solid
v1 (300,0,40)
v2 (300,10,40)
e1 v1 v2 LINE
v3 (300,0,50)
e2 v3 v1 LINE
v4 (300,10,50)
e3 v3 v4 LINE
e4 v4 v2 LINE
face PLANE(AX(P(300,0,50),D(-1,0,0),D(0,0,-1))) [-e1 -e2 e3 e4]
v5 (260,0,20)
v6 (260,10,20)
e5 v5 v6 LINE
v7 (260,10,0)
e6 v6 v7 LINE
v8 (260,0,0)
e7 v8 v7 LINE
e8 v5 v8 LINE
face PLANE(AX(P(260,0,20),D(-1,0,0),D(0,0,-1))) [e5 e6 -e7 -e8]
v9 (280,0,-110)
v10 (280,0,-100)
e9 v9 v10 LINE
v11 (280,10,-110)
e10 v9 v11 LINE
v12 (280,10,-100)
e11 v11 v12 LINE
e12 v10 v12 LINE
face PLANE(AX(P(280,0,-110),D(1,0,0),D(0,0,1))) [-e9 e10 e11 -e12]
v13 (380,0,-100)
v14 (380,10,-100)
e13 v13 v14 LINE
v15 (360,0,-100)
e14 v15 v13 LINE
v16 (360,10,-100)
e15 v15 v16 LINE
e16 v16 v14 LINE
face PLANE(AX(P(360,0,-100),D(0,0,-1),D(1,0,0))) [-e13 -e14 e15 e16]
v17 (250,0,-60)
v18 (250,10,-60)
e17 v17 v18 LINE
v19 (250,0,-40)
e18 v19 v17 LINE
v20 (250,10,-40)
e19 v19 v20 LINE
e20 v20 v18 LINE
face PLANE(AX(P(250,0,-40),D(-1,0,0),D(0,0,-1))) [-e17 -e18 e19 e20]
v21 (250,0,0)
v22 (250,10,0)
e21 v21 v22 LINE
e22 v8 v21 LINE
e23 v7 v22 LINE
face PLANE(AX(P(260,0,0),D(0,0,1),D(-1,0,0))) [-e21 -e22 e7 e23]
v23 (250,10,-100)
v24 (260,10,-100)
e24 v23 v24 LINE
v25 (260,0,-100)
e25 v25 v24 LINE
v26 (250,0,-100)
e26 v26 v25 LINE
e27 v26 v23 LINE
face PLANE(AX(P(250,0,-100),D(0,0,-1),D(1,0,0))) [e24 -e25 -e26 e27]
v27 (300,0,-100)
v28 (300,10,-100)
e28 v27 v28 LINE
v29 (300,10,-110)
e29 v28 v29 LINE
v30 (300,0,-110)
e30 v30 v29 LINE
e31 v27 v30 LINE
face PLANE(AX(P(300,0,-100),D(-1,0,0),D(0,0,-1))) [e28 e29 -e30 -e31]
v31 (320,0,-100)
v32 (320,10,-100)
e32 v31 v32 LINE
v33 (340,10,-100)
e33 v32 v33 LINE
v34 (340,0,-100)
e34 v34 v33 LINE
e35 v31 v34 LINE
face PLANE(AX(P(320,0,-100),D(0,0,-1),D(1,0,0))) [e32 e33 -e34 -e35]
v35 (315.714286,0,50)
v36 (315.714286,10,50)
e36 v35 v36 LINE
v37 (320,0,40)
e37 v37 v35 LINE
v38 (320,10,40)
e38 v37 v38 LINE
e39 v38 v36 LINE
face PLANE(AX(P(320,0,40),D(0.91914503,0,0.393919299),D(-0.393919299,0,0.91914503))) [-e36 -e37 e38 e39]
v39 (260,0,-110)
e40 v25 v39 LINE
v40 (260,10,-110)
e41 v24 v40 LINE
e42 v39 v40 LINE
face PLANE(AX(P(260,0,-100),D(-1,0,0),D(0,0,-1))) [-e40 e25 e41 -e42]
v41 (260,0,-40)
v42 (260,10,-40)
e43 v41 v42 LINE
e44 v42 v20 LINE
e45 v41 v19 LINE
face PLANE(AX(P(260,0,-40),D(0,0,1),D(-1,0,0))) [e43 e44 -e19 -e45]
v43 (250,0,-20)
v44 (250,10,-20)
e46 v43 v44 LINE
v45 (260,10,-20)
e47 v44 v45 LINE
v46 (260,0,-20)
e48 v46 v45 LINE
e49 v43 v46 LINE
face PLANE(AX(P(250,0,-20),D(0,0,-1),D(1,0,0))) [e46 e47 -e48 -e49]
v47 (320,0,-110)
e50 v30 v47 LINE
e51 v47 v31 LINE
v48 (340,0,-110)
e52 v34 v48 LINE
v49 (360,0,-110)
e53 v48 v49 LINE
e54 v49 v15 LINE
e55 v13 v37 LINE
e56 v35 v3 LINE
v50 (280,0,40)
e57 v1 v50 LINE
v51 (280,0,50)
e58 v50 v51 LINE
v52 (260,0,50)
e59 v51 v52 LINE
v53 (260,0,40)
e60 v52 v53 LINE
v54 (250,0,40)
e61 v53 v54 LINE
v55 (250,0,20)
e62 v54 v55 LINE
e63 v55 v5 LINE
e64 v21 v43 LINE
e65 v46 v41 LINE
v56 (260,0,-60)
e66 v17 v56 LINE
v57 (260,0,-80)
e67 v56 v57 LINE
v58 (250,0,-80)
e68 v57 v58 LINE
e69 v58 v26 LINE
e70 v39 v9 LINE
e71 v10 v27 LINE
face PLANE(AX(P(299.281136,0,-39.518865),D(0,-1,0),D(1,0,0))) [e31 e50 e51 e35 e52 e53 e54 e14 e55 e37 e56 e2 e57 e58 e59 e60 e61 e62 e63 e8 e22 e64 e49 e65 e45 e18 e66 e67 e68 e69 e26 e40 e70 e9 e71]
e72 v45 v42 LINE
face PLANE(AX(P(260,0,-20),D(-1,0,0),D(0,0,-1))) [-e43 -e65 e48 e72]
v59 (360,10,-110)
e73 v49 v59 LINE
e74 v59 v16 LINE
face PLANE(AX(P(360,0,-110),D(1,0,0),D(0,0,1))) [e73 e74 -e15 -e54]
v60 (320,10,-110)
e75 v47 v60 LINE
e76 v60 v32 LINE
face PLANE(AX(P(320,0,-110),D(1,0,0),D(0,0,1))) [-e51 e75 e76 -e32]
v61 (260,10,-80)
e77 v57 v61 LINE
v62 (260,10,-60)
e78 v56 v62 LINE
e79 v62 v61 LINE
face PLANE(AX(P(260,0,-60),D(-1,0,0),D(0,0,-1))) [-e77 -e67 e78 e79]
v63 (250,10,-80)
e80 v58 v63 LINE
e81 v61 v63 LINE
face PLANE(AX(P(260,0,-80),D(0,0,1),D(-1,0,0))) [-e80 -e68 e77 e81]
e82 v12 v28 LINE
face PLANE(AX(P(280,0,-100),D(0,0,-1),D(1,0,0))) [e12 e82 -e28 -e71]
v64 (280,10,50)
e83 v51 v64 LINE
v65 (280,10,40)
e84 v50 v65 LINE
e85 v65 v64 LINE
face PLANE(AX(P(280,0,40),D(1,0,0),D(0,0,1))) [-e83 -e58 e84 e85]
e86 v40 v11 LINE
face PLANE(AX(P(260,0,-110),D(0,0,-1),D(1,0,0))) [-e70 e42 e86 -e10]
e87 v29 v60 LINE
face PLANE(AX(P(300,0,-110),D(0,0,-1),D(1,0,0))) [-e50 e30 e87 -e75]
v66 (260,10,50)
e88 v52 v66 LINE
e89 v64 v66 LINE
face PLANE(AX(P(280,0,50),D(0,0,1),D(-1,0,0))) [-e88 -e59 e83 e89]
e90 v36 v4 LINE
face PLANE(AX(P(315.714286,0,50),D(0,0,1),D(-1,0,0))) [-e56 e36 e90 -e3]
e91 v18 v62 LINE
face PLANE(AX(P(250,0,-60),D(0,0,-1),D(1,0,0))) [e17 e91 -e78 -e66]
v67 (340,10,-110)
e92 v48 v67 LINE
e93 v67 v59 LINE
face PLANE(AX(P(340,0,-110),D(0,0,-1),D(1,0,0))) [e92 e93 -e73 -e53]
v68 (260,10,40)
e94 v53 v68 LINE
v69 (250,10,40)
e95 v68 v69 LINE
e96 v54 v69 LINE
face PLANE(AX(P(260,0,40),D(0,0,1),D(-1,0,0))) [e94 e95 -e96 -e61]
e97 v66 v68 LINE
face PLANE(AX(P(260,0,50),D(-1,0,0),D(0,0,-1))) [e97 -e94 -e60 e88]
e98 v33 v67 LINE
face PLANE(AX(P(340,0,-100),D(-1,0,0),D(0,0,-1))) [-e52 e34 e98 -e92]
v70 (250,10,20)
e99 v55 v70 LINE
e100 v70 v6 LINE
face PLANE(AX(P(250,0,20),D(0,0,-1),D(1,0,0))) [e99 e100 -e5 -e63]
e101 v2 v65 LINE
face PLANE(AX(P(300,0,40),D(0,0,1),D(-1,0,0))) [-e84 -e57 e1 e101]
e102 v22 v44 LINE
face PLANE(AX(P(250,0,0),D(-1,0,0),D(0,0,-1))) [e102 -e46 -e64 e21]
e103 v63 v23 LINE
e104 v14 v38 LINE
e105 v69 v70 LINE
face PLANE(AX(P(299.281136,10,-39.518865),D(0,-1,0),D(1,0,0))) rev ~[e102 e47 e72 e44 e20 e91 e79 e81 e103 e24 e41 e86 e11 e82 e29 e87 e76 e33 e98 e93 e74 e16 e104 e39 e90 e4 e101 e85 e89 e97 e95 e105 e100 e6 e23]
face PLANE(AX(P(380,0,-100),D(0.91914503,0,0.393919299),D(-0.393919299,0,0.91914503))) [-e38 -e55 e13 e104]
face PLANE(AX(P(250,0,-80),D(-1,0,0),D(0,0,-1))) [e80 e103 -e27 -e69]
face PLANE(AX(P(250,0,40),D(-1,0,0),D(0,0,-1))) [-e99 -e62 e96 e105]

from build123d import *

# Parameters (mm, degrees)
F1_DEPTH = 10


# Not quite as in the source:
# - a feature names something its author has since deleted; it is built from what else it names


with BuildPart() as f1:
    # F0 (on Front) → F1 (new body)
    with BuildSketch(Plane.XZ):
        Polygon((260, -100), (260, -110), (280, -110), (280, -100), (300, -100), (300, -110), (320, -110), (320, -100), (340, -100), (340, -110), (360, -110), (360, -100), (380, -100), (320, 40), (315.7142857143, 50), (300, 50), (300, 40), (280, 40), (280, 50), (260, 50), (260, 40), (250, 40), (250, 20), (260, 20), (260, 0), (250, 0), (250, -20), (260, -20), (260, -40), (250, -40), (250, -60), (260, -60), (260, -80), (250, -80), (250, -100), align=None)
    extrude(amount=-F1_DEPTH)


solid = f1.part
